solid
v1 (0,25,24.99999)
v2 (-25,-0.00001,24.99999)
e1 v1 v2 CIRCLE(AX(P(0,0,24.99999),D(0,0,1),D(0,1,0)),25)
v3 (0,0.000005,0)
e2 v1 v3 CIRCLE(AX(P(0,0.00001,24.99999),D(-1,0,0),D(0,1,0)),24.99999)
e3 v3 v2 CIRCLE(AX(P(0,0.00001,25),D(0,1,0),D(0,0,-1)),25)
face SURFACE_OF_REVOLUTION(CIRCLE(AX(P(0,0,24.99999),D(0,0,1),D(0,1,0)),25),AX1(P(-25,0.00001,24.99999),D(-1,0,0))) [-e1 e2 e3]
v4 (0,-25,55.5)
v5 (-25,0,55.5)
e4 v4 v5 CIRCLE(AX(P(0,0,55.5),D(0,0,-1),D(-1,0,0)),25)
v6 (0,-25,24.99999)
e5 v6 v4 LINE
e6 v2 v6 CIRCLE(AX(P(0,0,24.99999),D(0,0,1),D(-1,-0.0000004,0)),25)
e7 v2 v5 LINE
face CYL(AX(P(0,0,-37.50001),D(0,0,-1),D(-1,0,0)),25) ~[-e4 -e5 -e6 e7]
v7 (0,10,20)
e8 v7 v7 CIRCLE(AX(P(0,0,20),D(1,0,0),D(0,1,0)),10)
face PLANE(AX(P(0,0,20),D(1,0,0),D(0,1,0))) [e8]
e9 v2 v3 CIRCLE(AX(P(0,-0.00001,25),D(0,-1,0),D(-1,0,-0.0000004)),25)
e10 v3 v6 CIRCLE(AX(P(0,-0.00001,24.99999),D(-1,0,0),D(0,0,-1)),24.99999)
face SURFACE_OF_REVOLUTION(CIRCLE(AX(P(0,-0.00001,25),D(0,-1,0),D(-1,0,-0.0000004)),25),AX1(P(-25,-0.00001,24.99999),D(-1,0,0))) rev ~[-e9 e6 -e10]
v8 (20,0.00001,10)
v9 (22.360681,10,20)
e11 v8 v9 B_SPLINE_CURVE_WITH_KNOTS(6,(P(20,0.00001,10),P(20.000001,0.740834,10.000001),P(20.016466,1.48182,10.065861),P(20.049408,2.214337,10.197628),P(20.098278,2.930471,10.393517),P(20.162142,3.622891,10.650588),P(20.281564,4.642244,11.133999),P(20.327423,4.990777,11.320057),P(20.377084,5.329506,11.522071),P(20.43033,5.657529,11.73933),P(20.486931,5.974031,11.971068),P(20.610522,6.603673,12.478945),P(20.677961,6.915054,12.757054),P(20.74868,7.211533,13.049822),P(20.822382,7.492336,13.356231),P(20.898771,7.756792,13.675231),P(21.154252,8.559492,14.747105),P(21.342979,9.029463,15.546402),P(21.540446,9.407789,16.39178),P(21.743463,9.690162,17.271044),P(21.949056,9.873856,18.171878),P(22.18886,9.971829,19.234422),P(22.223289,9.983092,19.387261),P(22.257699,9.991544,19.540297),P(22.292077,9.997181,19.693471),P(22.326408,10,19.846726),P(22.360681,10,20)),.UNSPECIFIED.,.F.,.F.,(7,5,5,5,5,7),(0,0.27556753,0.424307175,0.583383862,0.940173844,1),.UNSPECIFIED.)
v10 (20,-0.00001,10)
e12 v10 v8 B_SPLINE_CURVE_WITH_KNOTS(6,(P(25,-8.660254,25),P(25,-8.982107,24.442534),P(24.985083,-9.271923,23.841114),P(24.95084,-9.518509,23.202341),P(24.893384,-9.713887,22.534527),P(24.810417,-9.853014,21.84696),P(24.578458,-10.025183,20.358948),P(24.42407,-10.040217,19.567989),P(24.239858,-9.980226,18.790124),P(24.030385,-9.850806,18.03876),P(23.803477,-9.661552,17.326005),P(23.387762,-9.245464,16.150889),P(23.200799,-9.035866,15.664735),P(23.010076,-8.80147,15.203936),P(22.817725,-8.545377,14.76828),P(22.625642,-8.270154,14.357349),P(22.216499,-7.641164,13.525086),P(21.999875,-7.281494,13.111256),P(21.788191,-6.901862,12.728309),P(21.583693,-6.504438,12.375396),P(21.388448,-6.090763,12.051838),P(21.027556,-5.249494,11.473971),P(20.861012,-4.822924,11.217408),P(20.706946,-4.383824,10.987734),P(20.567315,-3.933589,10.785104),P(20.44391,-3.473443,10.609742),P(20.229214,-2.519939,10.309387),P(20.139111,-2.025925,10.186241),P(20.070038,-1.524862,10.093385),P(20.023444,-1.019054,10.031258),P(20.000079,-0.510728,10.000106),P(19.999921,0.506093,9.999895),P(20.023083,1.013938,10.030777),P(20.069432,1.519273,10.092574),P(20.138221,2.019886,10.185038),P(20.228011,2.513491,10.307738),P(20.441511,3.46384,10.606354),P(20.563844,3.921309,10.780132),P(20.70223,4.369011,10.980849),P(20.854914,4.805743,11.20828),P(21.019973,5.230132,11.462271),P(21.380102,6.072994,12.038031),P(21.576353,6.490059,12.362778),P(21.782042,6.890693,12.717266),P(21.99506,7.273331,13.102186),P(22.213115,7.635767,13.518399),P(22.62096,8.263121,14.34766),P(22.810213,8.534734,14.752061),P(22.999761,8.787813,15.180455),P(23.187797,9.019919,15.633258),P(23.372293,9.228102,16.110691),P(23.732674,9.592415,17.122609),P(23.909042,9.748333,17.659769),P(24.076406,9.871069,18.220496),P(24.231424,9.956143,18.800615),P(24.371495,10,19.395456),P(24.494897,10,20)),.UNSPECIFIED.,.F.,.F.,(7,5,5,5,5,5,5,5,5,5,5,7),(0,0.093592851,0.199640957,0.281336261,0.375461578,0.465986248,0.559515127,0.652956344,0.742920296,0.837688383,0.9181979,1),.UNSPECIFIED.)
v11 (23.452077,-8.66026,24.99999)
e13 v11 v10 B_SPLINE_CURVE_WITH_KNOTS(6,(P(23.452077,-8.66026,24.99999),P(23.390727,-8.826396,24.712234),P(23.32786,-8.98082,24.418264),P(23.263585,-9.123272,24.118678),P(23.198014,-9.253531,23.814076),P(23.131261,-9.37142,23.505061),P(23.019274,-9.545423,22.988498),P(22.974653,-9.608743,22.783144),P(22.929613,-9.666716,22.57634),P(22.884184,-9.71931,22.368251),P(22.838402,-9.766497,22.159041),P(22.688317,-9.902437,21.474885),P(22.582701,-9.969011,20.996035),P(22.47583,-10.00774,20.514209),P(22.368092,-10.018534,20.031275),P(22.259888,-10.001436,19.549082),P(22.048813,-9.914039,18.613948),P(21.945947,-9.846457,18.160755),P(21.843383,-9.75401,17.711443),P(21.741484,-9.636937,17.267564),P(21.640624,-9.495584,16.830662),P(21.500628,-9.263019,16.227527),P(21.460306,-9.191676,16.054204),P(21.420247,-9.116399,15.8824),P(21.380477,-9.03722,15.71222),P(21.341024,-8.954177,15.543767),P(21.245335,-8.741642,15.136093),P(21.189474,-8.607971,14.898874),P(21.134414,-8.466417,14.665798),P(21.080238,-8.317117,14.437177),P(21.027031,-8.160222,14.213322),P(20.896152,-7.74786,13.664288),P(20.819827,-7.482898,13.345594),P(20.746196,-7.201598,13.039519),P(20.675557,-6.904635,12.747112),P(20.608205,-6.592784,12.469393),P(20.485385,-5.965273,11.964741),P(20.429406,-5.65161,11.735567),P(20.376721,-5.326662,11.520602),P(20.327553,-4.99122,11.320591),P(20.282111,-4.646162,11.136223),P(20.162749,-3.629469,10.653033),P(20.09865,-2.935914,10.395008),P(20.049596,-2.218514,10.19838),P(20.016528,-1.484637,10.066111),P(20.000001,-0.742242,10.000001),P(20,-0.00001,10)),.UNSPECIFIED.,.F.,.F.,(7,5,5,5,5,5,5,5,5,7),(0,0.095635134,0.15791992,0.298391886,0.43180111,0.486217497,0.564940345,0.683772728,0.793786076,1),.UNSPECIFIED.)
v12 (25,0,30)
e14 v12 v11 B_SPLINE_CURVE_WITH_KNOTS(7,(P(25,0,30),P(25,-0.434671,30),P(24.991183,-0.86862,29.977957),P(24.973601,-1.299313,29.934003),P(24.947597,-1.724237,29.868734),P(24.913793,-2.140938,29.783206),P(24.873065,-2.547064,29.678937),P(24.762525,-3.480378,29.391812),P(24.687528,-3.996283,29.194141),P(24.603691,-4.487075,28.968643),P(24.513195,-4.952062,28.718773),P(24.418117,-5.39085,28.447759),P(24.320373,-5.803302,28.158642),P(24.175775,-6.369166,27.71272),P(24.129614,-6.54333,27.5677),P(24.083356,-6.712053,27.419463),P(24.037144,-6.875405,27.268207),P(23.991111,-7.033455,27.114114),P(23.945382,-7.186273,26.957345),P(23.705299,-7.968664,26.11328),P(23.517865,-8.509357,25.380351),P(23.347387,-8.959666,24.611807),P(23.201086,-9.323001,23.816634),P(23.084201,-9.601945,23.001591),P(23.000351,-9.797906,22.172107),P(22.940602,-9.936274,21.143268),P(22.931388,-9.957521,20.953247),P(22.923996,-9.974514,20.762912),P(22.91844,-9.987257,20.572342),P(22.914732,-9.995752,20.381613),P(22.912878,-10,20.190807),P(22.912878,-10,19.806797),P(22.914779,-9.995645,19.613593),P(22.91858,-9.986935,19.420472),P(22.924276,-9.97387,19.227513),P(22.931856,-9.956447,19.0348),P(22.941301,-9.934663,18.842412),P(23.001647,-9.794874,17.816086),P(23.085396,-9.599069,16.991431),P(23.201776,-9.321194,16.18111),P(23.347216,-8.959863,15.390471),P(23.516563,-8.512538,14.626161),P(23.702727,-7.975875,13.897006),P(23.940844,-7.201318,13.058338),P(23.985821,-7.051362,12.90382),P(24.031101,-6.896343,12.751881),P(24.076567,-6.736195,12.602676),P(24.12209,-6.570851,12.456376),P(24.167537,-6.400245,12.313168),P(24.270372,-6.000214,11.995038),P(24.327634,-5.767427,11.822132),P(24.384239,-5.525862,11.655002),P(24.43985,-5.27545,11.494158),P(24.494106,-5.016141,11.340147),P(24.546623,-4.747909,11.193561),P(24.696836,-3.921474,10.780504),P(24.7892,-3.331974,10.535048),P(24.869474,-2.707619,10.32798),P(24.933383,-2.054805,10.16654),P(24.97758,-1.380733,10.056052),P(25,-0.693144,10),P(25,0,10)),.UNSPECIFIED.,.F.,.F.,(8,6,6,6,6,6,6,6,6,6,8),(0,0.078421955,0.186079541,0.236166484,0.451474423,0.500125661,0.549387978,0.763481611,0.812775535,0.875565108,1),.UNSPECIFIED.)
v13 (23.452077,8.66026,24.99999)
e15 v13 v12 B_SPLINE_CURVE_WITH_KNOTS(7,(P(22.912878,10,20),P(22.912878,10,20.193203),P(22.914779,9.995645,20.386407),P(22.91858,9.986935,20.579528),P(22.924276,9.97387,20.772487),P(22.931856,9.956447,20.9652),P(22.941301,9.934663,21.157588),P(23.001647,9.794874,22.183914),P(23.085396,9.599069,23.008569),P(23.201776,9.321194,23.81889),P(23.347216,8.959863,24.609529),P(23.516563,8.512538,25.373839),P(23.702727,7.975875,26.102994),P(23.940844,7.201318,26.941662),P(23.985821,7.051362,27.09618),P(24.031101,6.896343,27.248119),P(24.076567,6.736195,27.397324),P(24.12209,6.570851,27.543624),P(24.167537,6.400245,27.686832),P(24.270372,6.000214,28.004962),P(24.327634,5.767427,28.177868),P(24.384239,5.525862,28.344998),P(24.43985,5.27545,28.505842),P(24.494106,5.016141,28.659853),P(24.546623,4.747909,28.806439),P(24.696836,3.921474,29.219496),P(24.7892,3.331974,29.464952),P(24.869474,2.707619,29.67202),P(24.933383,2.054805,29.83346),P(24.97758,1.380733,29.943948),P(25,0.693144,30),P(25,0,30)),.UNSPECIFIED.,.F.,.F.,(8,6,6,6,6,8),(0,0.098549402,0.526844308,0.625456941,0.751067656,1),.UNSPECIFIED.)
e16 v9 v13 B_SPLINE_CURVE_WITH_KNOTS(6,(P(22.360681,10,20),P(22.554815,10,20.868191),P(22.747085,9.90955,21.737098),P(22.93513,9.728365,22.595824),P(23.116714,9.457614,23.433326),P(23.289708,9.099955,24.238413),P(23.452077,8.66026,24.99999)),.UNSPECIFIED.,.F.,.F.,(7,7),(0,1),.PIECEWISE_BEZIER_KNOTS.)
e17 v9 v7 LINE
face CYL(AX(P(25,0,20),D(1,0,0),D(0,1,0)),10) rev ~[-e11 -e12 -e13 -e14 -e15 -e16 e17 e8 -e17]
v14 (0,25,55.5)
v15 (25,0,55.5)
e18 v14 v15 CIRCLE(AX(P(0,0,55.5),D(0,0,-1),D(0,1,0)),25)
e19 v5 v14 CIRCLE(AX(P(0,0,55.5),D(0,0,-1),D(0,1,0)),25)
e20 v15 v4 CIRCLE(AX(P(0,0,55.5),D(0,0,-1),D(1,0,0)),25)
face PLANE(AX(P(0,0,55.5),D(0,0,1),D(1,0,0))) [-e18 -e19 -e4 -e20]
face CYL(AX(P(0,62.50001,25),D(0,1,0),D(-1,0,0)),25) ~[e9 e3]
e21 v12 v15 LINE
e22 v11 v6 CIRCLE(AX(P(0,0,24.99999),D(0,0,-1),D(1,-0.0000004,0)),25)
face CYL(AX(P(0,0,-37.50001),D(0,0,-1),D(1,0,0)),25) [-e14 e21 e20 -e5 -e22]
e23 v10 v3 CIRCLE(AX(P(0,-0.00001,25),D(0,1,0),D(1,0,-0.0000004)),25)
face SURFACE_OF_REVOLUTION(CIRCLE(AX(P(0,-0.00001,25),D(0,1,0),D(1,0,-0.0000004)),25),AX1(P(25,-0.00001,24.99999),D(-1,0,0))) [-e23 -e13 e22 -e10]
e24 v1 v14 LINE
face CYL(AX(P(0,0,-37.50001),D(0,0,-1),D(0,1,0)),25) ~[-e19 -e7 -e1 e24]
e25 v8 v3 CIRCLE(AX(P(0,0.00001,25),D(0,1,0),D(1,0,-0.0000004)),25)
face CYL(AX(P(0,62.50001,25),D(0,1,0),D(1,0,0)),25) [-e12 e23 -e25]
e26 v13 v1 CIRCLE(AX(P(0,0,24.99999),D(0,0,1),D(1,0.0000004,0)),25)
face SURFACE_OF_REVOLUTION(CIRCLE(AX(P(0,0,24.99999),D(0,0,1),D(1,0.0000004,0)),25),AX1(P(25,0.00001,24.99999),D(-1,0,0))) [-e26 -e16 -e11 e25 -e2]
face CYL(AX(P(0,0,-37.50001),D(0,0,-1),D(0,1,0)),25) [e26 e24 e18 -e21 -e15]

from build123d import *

# Parameters (mm, degrees)
F0_W         = 50
F0_H         = 50
F1_DEPTH     = 55.5
F2_R         = 10
F3_DEPTH     = 25
F4_R         = 24.99999
F5_T1_DEPTH  = 155.50001
F5_T3_DEPTH  = 125.00002
F5_T6_ANGLE  = 90
F5_T8_ANGLE  = 90
F5_T10_ANGLE = 90
F5_T12_ANGLE = 90


# Not quite as in the source:
# - a fillet or chamfer that OpenCascade refuses, or shapes differently, is made with other operations: its cross-section is extruded or revolved along the edge and cut away or added
# - a fillet or chamfer is up to 0.001 mm smaller than in the source, because OpenCascade refuses the exact size


with BuildPart() as f1:
    # F0 (on Top) → F1 (new body)
    with BuildSketch(Plane.XY):
        Rectangle(F0_W, F0_H)
    extrude(amount=F1_DEPTH)

    # F2 (on face) → F3 (cut)
    with BuildSketch(Plane.YZ.offset(25)):
        with Locations((0, 20)):
            Circle(F2_R)
    extrude(amount=-F3_DEPTH, mode=Mode.SUBTRACT)

    # F4 (radius 25 in the source; OpenCascade refuses exactly that, so slightly less here)
    f4_edges = [f1.edges().sort_by_distance(p)[0] for p in [
        (0, -25, 0),
        (0, 25, 0),
    ]]
    fillet(f4_edges, radius=F4_R)

    # F5: fillet of radius 25 on 2 edges, made by hand

    # F5_s2 → F5_t1 (cut)
    with BuildSketch(Plane.XY.offset(-37.50001)):
        with BuildLine():
            ThreePointArc((25, 0), (17.6776695297, -17.6776695297), (0, -25))
            Line((0, -25), (25, -25))
            Line((25, -25), (25, 0))
        make_face()
        with BuildLine():
            ThreePointArc((-25, 0), (-17.6776695297, -17.6776695297), (0, -25))
            Line((0, -25), (-25, -25))
            Line((-25, -25), (-25, 0))
        make_face()
        with BuildLine():
            ThreePointArc((0, 25), (-17.6776695297, 17.6776695297), (-25, 0))
            Line((-25, 0), (-25, 25))
            Line((-25, 25), (0, 25))
        make_face()
        with BuildLine():
            ThreePointArc((0, 25), (17.6776695297, 17.6776695297), (25, 0))
            Line((25, 0), (25, 25))
            Line((25, 25), (0, 25))
        make_face()
    extrude(amount=F5_T1_DEPTH, mode=Mode.SUBTRACT)

    # F5_s4 → F5_t3 (cut)
    with BuildSketch(Plane.XZ.offset(-62.50001)):
        with BuildLine():
            ThreePointArc((-25, 25), (-17.6776695297, 7.3223304703), (0, 0))
            Line((0, 0), (-25, 0))
            Line((-25, 0), (-25, 25))
        make_face()
        with BuildLine():
            ThreePointArc((25, 25), (17.6776695297, 7.3223304703), (0, 0))
            Line((0, 0), (25, 0))
            Line((25, 0), (25, 25))
        make_face()
    extrude(amount=F5_T3_DEPTH, mode=Mode.SUBTRACT)

    # F5_s5 → F5_t6 (revolve, cut)
    with BuildSketch(Plane.XZ.offset(1e-05)):
        with BuildLine():
            ThreePointArc((-25, 24.99999), (-17.6776659941, 7.3223269348), (0, 0))
            Line((0, 0), (-25, 0))
            Line((-25, 0), (-25, 24.99999))
        make_face()
    revolve(axis=Axis((-25, -1e-05, 24.99999), (-1, 0, 0)), revolution_arc=F5_T6_ANGLE, mode=Mode.SUBTRACT)

    # F5_s7 → F5_t8 (revolve, cut)
    with BuildSketch(Plane.XY.offset(24.99999)):
        with BuildLine():
            ThreePointArc((0, 25), (-17.6776659941, 17.6776730652), (-25, 1e-05))
            Line((-25, 1e-05), (-25, 25))
            Line((-25, 25), (0, 25))
        make_face()
    revolve(axis=Axis((-25, 1e-05, 24.99999), (-1, 0, 0)), revolution_arc=F5_T8_ANGLE, mode=Mode.SUBTRACT)

    # F5_s9 → F5_t10 (revolve, cut)
    with BuildSketch(Plane.XZ.offset(1e-05)):
        with BuildLine():
            ThreePointArc((25, 24.99999), (17.6776659941, 7.3223269348), (0, 0))
            Line((0, 0), (25, 0))
            Line((25, 0), (25, 24.99999))
        make_face()
    revolve(axis=Axis((25, -1e-05, 24.99999), (-1, 0, 0)), revolution_arc=F5_T10_ANGLE, mode=Mode.SUBTRACT)

    # F5_s11 → F5_t12 (revolve, cut)
    with BuildSketch(Plane.XY.offset(24.99999)):
        with BuildLine():
            ThreePointArc((25, 1e-05), (17.6776659941, 17.6776730652), (0, 25))
            Line((0, 25), (25, 25))
            Line((25, 25), (25, 1e-05))
        make_face()
    revolve(axis=Axis((25, 1e-05, 24.99999), (-1, 0, 0)), revolution_arc=F5_T12_ANGLE, mode=Mode.SUBTRACT)


solid = f1.part
